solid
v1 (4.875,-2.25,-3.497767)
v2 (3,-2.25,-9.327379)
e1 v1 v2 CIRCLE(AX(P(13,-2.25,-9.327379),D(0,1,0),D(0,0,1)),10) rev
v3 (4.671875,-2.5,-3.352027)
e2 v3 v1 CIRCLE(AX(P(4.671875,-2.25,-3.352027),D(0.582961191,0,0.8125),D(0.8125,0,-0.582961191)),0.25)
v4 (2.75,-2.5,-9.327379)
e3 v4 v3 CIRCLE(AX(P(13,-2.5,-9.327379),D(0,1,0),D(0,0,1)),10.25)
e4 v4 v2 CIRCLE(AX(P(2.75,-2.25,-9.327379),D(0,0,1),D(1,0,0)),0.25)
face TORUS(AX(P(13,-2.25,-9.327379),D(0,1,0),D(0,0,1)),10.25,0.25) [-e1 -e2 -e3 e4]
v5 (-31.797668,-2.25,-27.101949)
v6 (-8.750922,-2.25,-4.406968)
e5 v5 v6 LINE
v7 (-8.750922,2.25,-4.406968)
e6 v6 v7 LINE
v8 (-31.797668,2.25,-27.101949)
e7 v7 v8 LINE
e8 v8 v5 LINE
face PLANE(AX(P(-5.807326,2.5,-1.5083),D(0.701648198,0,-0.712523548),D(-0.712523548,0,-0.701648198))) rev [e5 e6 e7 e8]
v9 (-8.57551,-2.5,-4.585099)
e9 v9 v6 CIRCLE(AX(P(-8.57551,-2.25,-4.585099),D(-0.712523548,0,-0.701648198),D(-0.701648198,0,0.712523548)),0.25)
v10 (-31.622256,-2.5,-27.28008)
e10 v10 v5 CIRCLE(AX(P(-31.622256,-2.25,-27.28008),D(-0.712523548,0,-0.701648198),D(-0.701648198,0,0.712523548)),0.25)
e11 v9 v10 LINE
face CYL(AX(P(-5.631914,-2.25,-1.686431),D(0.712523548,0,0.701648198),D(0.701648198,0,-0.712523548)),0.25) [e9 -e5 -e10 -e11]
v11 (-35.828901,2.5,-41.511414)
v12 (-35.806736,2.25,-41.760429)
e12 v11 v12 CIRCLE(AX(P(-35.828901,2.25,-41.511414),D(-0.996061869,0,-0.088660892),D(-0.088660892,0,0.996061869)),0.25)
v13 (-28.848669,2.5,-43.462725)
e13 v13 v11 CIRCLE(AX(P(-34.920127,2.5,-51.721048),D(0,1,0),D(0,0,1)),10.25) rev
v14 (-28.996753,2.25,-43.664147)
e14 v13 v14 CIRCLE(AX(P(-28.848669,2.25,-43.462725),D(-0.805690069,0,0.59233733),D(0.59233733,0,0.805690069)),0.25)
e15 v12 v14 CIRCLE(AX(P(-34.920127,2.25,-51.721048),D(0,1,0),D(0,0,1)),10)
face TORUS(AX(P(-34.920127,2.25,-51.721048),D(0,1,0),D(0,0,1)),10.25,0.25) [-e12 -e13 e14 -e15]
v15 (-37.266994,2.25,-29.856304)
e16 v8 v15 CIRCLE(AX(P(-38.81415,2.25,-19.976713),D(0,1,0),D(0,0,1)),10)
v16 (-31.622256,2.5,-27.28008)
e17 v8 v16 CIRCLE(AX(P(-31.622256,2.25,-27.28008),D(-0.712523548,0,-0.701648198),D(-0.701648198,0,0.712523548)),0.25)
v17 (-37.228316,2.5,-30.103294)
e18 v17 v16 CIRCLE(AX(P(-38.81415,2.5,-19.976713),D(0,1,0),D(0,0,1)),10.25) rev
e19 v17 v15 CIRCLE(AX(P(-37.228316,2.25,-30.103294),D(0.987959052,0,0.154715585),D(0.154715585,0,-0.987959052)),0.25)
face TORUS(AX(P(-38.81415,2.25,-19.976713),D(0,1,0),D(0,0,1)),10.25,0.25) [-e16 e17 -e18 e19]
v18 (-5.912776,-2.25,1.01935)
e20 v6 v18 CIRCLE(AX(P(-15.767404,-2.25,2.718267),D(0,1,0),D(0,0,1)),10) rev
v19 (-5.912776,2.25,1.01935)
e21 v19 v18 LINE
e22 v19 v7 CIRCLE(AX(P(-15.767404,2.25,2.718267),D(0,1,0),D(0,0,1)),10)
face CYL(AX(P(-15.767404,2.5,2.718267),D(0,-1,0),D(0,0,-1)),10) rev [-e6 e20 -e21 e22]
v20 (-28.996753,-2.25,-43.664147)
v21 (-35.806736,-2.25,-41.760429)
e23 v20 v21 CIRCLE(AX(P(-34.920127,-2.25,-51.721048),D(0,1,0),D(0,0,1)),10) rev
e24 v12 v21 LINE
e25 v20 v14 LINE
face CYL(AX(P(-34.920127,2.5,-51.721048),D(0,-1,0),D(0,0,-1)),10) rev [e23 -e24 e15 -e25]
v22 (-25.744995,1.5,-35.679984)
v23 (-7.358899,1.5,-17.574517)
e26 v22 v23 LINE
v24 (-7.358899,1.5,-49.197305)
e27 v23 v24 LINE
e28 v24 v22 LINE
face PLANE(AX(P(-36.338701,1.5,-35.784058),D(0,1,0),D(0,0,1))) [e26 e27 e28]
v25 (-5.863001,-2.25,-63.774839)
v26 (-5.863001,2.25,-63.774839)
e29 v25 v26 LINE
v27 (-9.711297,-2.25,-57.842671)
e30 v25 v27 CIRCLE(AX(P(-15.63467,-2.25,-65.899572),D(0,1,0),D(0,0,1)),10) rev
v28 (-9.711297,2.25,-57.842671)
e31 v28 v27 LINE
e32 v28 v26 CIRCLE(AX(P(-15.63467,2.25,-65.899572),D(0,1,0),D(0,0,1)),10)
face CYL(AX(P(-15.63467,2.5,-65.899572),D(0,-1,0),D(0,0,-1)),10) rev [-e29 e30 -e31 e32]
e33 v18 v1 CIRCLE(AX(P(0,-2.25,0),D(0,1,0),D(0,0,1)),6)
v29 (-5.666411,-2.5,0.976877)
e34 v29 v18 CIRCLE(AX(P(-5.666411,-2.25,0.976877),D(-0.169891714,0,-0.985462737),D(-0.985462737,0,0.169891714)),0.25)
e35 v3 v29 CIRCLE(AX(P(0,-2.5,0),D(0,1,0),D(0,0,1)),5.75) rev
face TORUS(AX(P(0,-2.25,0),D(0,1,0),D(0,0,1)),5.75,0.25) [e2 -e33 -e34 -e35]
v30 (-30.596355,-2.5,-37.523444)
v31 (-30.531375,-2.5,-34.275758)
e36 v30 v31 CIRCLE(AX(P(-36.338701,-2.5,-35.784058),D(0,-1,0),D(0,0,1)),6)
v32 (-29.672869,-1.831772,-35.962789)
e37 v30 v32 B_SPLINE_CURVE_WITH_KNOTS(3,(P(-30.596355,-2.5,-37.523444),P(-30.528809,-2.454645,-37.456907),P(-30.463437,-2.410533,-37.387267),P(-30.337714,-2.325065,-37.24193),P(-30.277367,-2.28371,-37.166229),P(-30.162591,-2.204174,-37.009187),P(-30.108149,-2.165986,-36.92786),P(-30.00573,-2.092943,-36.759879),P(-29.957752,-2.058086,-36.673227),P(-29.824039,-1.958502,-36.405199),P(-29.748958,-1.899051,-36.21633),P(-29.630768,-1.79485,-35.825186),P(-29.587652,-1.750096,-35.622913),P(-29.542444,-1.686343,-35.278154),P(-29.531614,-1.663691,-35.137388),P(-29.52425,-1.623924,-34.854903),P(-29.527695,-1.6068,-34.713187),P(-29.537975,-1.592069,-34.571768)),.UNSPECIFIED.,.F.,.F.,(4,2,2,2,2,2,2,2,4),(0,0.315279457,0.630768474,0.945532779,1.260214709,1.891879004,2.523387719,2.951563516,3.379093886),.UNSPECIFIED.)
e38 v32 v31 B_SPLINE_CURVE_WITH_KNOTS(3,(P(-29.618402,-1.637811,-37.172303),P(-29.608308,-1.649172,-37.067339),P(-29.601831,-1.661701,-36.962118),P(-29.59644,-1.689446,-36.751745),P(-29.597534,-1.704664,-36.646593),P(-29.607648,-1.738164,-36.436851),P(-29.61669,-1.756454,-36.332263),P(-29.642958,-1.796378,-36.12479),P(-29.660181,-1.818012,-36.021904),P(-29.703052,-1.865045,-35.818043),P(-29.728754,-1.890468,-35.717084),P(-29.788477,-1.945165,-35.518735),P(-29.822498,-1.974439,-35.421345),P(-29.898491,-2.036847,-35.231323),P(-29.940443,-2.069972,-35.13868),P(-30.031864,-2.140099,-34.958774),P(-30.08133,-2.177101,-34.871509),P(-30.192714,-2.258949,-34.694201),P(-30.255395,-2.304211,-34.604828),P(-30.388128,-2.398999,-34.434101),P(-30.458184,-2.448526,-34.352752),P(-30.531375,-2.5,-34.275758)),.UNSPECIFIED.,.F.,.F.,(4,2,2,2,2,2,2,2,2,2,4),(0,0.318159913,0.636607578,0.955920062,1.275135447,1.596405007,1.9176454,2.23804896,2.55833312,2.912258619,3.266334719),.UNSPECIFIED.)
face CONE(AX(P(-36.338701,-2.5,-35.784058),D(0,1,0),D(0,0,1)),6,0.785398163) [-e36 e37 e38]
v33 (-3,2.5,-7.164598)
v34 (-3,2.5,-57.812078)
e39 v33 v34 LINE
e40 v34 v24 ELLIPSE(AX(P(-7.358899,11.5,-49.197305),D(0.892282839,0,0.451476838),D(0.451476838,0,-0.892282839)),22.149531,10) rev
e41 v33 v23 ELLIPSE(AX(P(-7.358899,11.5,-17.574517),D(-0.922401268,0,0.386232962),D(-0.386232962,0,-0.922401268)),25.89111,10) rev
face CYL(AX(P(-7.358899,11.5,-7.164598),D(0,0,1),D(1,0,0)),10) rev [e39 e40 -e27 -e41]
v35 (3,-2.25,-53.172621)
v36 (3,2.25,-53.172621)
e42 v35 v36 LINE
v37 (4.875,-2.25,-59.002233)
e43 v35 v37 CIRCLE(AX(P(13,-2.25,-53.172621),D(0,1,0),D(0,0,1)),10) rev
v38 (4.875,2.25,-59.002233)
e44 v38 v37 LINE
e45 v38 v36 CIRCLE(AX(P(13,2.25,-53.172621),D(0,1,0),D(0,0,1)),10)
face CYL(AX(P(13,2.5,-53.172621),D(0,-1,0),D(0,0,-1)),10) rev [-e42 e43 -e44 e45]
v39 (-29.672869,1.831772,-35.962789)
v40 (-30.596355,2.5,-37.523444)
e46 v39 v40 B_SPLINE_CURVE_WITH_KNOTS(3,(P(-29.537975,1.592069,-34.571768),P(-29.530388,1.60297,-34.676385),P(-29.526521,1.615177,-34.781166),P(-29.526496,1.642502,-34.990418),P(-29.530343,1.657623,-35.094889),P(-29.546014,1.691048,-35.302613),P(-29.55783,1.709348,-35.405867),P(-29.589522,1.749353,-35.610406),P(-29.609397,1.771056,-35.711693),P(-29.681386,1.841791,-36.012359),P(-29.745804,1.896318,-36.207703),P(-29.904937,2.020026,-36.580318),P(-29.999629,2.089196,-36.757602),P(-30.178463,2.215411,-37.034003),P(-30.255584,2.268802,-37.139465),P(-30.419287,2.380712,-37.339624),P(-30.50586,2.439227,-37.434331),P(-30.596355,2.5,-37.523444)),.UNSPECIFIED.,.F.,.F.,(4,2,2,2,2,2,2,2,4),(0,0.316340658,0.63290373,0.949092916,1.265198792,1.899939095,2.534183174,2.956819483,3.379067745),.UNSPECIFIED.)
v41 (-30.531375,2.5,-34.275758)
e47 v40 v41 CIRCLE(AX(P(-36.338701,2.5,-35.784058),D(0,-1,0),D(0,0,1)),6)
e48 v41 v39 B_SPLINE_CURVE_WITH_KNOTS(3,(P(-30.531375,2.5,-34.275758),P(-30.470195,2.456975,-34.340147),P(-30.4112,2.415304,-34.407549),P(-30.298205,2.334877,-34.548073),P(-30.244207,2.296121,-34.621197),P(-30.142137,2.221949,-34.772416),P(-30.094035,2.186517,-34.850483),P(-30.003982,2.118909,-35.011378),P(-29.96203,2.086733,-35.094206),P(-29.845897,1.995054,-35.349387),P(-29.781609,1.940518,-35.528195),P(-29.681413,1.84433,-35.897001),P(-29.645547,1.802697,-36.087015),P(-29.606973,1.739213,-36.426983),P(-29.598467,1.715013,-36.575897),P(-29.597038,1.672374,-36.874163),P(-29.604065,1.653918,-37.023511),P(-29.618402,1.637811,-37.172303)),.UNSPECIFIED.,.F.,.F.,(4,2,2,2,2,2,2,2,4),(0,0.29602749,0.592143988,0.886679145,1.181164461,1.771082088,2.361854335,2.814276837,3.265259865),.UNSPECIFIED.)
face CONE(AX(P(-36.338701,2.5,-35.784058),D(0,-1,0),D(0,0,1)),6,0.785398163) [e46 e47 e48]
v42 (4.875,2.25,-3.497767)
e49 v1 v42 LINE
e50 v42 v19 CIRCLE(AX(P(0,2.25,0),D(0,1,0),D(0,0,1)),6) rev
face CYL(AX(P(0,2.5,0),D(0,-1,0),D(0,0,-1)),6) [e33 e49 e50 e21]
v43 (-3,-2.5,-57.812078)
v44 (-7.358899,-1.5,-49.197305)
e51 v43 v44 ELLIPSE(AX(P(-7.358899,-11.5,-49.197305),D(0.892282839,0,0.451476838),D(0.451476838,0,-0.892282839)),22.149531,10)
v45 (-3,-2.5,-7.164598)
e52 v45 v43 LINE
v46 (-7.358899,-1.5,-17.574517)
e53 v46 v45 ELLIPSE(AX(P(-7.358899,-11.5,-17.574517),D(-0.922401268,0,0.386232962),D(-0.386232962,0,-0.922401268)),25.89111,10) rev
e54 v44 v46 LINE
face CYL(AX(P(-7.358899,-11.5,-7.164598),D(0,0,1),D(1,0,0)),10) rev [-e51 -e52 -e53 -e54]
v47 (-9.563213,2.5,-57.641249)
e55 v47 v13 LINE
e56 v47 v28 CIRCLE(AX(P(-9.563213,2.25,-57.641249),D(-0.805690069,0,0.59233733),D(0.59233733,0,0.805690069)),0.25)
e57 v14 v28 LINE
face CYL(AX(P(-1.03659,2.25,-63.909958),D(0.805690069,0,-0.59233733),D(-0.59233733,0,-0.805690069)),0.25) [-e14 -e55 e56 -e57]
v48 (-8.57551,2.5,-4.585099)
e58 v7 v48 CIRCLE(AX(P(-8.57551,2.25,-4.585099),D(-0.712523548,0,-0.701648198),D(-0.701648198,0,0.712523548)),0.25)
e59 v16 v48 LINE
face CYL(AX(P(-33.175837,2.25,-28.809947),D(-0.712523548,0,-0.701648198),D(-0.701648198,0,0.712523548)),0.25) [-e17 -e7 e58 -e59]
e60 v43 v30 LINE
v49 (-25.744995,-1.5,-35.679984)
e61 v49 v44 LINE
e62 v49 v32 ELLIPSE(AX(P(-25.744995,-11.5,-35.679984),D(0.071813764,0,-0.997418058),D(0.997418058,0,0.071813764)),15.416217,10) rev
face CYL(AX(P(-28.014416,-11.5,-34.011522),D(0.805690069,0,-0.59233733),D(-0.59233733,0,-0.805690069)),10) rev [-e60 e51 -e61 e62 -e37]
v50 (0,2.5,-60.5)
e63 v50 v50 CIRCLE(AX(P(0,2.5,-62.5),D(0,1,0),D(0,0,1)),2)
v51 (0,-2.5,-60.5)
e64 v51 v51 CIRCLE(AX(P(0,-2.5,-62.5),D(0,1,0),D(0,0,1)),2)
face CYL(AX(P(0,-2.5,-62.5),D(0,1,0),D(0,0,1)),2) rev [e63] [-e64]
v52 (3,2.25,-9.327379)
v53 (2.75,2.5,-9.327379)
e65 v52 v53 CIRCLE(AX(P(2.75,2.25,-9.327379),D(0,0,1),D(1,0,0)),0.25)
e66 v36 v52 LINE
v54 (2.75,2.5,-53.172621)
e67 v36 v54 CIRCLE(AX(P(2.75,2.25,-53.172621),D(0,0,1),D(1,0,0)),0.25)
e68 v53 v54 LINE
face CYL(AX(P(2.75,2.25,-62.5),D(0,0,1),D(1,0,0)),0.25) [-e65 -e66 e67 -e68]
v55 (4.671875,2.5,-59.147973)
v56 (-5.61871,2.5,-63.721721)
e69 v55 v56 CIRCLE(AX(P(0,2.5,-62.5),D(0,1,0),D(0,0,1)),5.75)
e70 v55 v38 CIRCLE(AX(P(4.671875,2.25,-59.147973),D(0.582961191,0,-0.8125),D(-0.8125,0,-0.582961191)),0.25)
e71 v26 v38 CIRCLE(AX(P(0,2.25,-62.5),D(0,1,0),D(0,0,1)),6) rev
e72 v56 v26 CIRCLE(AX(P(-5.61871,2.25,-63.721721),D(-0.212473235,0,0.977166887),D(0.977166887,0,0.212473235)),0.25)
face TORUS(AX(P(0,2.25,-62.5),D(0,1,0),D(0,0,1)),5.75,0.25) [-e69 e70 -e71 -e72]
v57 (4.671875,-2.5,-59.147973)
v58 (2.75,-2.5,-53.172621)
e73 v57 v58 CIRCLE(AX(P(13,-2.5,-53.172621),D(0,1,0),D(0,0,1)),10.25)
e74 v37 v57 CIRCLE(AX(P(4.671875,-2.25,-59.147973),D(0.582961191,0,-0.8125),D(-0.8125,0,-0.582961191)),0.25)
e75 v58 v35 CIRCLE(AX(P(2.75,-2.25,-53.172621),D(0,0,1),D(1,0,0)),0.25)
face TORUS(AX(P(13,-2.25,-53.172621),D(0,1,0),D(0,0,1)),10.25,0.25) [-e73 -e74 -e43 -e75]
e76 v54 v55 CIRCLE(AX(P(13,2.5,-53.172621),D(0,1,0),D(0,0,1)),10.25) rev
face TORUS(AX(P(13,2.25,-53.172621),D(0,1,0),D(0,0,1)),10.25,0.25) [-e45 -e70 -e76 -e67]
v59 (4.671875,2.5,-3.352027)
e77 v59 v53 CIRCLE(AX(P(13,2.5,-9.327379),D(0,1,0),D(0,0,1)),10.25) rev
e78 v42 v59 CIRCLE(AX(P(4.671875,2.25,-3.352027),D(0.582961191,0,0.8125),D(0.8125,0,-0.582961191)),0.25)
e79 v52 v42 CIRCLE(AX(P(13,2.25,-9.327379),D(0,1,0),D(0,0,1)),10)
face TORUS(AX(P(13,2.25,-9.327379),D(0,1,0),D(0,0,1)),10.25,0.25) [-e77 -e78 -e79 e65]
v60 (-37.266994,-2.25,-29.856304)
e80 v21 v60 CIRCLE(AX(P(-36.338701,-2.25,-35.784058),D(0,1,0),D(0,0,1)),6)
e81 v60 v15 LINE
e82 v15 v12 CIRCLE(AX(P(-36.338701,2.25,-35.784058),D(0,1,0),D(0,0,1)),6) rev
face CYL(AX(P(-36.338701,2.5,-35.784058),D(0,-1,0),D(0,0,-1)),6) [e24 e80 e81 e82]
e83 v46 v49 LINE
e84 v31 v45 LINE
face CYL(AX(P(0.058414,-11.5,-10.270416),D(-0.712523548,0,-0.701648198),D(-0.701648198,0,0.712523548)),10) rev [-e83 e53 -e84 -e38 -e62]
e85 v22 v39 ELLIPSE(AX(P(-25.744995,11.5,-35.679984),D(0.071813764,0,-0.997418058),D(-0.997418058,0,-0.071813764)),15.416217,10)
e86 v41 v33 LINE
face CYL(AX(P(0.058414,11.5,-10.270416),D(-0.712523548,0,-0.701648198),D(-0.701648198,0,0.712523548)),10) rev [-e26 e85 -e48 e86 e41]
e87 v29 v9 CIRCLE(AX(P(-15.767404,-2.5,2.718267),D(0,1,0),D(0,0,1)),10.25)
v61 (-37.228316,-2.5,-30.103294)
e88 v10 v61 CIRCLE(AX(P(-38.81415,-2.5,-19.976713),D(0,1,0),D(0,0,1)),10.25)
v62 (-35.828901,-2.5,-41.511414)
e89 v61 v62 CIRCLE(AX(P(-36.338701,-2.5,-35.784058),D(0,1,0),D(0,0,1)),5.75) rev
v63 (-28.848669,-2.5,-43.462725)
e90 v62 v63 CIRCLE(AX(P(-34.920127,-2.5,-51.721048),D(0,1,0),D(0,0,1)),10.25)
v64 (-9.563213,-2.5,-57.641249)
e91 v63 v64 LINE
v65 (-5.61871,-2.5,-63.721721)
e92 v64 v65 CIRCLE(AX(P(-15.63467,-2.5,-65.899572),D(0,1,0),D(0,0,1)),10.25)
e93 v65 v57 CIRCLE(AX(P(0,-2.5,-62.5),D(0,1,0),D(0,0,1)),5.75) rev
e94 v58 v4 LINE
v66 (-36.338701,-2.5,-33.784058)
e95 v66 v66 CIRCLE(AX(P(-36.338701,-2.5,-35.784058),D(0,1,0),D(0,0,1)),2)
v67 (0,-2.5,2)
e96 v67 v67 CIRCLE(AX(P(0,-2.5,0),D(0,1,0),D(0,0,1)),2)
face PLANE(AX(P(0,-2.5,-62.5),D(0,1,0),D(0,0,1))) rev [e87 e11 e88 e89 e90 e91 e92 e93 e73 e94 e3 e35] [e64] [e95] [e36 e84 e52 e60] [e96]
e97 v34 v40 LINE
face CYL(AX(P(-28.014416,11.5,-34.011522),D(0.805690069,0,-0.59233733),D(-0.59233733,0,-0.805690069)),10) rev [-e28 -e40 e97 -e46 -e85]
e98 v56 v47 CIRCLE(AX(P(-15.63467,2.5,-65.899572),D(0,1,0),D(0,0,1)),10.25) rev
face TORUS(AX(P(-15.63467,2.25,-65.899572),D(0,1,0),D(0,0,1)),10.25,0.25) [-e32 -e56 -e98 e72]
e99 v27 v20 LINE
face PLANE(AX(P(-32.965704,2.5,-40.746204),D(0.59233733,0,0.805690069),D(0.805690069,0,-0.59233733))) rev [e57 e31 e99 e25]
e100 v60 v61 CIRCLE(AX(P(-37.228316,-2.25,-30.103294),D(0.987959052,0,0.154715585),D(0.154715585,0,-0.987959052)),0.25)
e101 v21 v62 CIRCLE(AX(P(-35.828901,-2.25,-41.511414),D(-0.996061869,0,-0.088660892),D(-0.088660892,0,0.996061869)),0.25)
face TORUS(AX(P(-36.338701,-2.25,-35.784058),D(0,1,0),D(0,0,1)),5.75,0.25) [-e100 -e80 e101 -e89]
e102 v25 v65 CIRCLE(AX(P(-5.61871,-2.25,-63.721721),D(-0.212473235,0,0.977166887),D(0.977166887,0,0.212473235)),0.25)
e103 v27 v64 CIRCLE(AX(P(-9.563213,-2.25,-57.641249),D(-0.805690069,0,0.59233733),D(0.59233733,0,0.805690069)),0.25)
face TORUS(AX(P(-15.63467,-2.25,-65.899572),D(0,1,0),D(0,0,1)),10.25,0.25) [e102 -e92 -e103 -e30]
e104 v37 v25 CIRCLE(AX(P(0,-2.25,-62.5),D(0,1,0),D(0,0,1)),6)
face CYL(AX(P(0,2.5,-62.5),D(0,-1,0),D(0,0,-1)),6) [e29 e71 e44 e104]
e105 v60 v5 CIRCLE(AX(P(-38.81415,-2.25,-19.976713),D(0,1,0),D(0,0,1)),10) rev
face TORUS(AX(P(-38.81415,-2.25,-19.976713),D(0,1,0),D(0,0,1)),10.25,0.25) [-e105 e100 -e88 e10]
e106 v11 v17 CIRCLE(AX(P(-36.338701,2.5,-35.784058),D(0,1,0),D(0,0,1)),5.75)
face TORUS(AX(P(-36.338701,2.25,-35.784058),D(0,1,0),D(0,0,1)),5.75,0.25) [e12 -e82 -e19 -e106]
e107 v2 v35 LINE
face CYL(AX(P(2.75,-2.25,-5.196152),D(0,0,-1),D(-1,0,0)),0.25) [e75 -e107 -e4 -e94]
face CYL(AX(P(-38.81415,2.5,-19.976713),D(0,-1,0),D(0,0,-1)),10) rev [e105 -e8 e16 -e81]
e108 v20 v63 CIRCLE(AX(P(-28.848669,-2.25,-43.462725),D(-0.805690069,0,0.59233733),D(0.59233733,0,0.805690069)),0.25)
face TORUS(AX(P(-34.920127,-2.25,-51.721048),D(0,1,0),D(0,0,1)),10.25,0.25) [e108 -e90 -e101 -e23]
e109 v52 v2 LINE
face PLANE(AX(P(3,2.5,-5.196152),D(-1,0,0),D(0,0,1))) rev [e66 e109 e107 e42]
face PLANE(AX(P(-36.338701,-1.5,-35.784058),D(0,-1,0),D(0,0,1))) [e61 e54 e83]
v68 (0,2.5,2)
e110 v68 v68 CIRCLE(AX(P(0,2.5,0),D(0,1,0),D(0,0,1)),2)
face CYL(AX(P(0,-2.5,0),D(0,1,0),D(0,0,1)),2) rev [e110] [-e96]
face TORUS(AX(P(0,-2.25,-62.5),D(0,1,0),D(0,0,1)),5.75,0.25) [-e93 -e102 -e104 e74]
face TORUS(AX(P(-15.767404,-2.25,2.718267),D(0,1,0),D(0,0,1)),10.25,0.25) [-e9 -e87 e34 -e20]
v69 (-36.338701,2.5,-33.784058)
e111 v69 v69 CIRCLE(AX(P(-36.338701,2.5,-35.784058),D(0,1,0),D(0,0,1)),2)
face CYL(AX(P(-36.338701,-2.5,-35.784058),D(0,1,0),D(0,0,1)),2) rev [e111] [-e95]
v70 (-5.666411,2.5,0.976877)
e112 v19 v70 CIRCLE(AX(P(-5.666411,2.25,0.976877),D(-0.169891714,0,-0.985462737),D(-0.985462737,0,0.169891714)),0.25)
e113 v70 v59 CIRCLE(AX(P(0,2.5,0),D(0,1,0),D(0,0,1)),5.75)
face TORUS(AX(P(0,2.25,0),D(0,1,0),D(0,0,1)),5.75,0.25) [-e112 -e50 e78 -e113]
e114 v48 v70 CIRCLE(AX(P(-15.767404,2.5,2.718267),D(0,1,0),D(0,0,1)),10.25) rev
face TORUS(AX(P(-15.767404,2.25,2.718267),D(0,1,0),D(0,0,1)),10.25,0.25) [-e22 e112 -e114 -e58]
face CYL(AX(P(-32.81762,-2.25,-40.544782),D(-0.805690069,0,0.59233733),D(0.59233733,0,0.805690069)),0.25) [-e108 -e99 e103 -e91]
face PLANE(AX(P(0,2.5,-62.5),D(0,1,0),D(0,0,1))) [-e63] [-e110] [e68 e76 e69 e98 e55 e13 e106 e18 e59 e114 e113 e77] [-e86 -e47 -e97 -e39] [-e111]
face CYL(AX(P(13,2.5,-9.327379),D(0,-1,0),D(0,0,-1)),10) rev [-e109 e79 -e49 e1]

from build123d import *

# Parameters (mm, degrees)
BOSS_EXTRUDE1_DEPTH = 2.5
SKETCH6_R           = 2
CUT_EXTRUDE2_DEPTH  = 81.683428275
FILLET1_R           = 10
FILLET2_R           = 0.25
CUT_EXTRUDE3_DEPTH  = 1
CUT_EXTRUDE3_DRAFT  = -45
FILLET3_R           = 10


# Read off the part's stored shape, not the designer's step: Mirror1
with BuildPart() as part:
    # Sketch5 → Boss-Extrude1 (new, symmetric)
    with BuildSketch(Plane(origin=(0, 0, 0), x_dir=(1, 0, 0), z_dir=(0, 1, 0))):
        with BuildLine():
            Line((-32.965704319, 40.746204167), (-5.742345952, 60.760614197))
            ThreePointArc((-5.742345952, 60.760614197), (2.206223968, 68.07965732), (3, 57.303847577))
            Line((3, 57.303847577), (3, 5.196152423))
            ThreePointArc((3, 5.196152423), (2.317397773, -5.534407607), (-5.807325554, 1.508300339))
            Line((-5.807325554, 1.508300339), (-34.741264584, 30.00061646))
            ThreePointArc((-34.741264584, 30.00061646), (-42.258431929, 36.762212041), (-32.965704319, 40.746204167))
        make_face()
    extrude(amount=BOSS_EXTRUDE1_DEPTH, both=True)

    # Sketch6 → Cut-Extrude2 (cut, through all)
    with BuildSketch(Plane(origin=(0, 2.5, 0), x_dir=(1, 0, 0), z_dir=(0, 1, 0))):
        with Locations(Location((-36.338700951, 35.784058087, 0), (0, 0, 270))):
            Circle(SKETCH6_R)
        with Locations(Location((0, 62.5, 0), (0, 0, 270))):
            Circle(SKETCH6_R)
        with Locations(Location((0, 0, 0), (0, 0, 270))):
            Circle(SKETCH6_R)
    extrude(amount=-CUT_EXTRUDE2_DEPTH, mode=Mode.SUBTRACT)

    # Fillet1
    fillet1_edges = [part.edges().sort_by_distance(p)[0] for p in [
        (3, 0, -57.303847577),
        (3, 0, -5.196152423),
        (-5.807325554, 0, -1.508300339),
        (-34.741264584, 0, -30.00061646),
        (-32.965704319, 0, -40.746204167),
        (-5.742345952, 0, -60.760614197),
    ]]
    fillet(fillet1_edges, radius=FILLET1_R)

    # Fillet2
    fillet2_edges = [part.edges().sort_by_distance(p)[0] for p in [
        (2.317397773, -2.5, 5.534407607),
        (2.317397773, 2.5, 5.534407607),
        (-20.274295069, -2.5, -15.754458399),
        (-20.274295069, 2.5, -15.754458399),
        (-42.294061571, -2.5, -36.514592059),
        (-42.294061571, 2.5, -36.514592059),
        (-19.354025135, -2.5, -50.753409182),
        (-19.354025135, 2.5, -50.753409182),
        (2.436899667, -2.5, -67.982838682),
        (2.436899667, 2.5, -67.982838682),
        (3, -2.5, -31.25),
        (3, 2.5, -31.25),
        (-6.906263042, -2.5, -1.916404592),
        (-6.906263042, 2.5, -1.916404592),
        (-34.316307366, -2.5, -28.908085432),
        (-34.316307366, 2.5, -28.908085432),
        (-32.227862875, -2.5, -42.090278775),
        (-32.227862875, 2.5, -42.090278775),
        (-7.245317265, -2.5, -60.457259979),
        (-7.245317265, 2.5, -60.457259979),
        (3.480283618, -2.5, -56.234483125),
        (3.480283618, 2.5, -56.234483125),
        (3.480283618, -2.5, -6.265516875),
        (3.480283618, 2.5, -6.265516875),
    ]]
    fillet(fillet2_edges, radius=FILLET2_R)


with BuildPart() as cut_extrude3_tool:
    # Sketch11 → Cut-Extrude3 (with draft: the straight prism first)
    with BuildSketch(Plane(origin=(0, 2.5, 0), x_dir=(1, 0, 0), z_dir=(0, 1, 0))):
        with BuildLine():
            ThreePointArc((-30.596355, 37.52344389), (-30.339901547, 35.904081877), (-30.531375397, 34.275757748))
            Line((-30.531375397, 34.275757748), (-3, 7.164597728))
            Line((-3, 7.164597728), (-3, 57.812078262))
            Line((-3, 57.812078262), (-30.596355, 37.52344389))
        make_face()
    extrude(amount=-CUT_EXTRUDE3_DEPTH)
    # Cut-Extrude3: the draft: its side faces are tilted about the plane it starts from
    cut_extrude3_sides = [cut_extrude3_tool.faces().sort_by_distance(p)[0] for p in [
        (-30.339901547, 2, -35.904081877),
        (-16.765687699, 2, -20.720177738),
        (-3, 2, -32.488337995),
        (-16.7981775, 2, -47.667761076),
    ]]
    draft(cut_extrude3_sides, Plane(origin=(0, 2.5, 0), x_dir=(1, 0, 0), z_dir=(0, 1, 0)), CUT_EXTRUDE3_DRAFT)


with BuildPart() as part_1:
    add(part.part)

    # Cut-Extrude3: cut by cut_extrude3_tool
    add(cut_extrude3_tool.part, mode=Mode.SUBTRACT)

    # Fillet3
    # the kernel refuses this fillet: 10 mm, written as the material it adds along each edge
    with BuildSketch(Plane(origin=(-35.422208483, 1.5, -40.495403727), x_dir=(-0.4961401986594238, 0.7071067811865456, 0.5038302325924777), z_dir=(0.712523548065871, 0, 0.701648197782637))) as fillet3_piece_1_section:
        with BuildLine():
            CenterArc((4.695967592, -9.446168032), FILLET3_R, 109.158067237, 25.841932763)
            Line((-2.37510022, -2.37510022), (0, 0))
            Line((0, 0), (1.414213562, 0))
        make_face()
    fillet3_piece_1 = extrude(amount=52.497135101, mode=Mode.PRIVATE)
    fillet3_piece_1 = split(fillet3_piece_1, bisect_by=Plane(origin=(-21.679167278, -8.239532903, -30.749685658), z_dir=(0.4188457426606433, 0.7071067811865488, 0.5697089115110034)), keep=Keep.TOP, mode=Mode.PRIVATE)
    fillet3_piece_1 = split(fillet3_piece_1, bisect_by=Plane(origin=(-9.768964958, -4.268964958, -22.714341228), z_dir=(-0.7071067811865462, 0.7071067811865488, 0)), keep=Keep.TOP, mode=Mode.PRIVATE)
    add(fillet3_piece_1)
    with BuildSketch(Plane(origin=(2.765578806, 1.5, -60.809716743), x_dir=(-0.4188457426606457, 0.7071067811865447, -0.5697089115110068), z_dir=(-0.805690069263676, 0, 0.5923373298129141))) as fillet3_piece_2_section:
        with BuildLine():
            CenterArc((4.695967592, -9.446168032), FILLET3_R, 109.158067237, 25.841932763)
            Line((-2.37510022, -2.37510022), (0, 0))
            Line((0, 0), (1.414213562, 0))
        make_face()
    fillet3_piece_2 = extrude(amount=48.40225373, mode=Mode.PRIVATE)
    fillet3_piece_2 = split(fillet3_piece_2, bisect_by=Plane(origin=(-9.835247725, -4.335247725, -45.695753356), z_dir=(-0.7071067811865462, 0.7071067811865488, 0)), keep=Keep.TOP, mode=Mode.PRIVATE)
    add(fillet3_piece_2)
    with BuildSketch(Plane(origin=(-4, 1.5, -1.155549611), x_dir=(0.7071067811865488, 0.7071067811865462, 0), z_dir=(0, 0, -1))) as fillet3_piece_3_section:
        with BuildLine():
            CenterArc((4.695967592, -9.446168032), FILLET3_R, 109.158067237, 25.841932763)
            Line((-2.37510022, -2.37510022), (0, 0))
            Line((0, 0), (1.414213562, 0))
        make_face()
    fillet3_piece_3 = extrude(amount=63.077411412, mode=Mode.PRIVATE)
    fillet3_piece_3 = split(fillet3_piece_3, bisect_by=Plane(origin=(-10.603901171, -7.527129797, -39.776353526), z_dir=(0.4188457426606433, 0.7071067811865488, 0.5697089115110034)), keep=Keep.TOP, mode=Mode.PRIVATE)
    fillet3_piece_3 = split(fillet3_piece_3, bisect_by=Plane(origin=(-10.614934948, -6.100094299, -26.733213697), z_dir=(0.49614019865942166, 0.7071067811865488, -0.5038302325924754)), keep=Keep.TOP, mode=Mode.PRIVATE)
    add(fillet3_piece_3)

    # Mirror1
    split(bisect_by=Plane.ZX, keep=Keep.TOP)

    # Mirror1 2: part across plane


with BuildPart() as part_2:
    add(part_1.part)
    add(part_1.part.mirror(Plane.ZX))


solid = part_2.part
